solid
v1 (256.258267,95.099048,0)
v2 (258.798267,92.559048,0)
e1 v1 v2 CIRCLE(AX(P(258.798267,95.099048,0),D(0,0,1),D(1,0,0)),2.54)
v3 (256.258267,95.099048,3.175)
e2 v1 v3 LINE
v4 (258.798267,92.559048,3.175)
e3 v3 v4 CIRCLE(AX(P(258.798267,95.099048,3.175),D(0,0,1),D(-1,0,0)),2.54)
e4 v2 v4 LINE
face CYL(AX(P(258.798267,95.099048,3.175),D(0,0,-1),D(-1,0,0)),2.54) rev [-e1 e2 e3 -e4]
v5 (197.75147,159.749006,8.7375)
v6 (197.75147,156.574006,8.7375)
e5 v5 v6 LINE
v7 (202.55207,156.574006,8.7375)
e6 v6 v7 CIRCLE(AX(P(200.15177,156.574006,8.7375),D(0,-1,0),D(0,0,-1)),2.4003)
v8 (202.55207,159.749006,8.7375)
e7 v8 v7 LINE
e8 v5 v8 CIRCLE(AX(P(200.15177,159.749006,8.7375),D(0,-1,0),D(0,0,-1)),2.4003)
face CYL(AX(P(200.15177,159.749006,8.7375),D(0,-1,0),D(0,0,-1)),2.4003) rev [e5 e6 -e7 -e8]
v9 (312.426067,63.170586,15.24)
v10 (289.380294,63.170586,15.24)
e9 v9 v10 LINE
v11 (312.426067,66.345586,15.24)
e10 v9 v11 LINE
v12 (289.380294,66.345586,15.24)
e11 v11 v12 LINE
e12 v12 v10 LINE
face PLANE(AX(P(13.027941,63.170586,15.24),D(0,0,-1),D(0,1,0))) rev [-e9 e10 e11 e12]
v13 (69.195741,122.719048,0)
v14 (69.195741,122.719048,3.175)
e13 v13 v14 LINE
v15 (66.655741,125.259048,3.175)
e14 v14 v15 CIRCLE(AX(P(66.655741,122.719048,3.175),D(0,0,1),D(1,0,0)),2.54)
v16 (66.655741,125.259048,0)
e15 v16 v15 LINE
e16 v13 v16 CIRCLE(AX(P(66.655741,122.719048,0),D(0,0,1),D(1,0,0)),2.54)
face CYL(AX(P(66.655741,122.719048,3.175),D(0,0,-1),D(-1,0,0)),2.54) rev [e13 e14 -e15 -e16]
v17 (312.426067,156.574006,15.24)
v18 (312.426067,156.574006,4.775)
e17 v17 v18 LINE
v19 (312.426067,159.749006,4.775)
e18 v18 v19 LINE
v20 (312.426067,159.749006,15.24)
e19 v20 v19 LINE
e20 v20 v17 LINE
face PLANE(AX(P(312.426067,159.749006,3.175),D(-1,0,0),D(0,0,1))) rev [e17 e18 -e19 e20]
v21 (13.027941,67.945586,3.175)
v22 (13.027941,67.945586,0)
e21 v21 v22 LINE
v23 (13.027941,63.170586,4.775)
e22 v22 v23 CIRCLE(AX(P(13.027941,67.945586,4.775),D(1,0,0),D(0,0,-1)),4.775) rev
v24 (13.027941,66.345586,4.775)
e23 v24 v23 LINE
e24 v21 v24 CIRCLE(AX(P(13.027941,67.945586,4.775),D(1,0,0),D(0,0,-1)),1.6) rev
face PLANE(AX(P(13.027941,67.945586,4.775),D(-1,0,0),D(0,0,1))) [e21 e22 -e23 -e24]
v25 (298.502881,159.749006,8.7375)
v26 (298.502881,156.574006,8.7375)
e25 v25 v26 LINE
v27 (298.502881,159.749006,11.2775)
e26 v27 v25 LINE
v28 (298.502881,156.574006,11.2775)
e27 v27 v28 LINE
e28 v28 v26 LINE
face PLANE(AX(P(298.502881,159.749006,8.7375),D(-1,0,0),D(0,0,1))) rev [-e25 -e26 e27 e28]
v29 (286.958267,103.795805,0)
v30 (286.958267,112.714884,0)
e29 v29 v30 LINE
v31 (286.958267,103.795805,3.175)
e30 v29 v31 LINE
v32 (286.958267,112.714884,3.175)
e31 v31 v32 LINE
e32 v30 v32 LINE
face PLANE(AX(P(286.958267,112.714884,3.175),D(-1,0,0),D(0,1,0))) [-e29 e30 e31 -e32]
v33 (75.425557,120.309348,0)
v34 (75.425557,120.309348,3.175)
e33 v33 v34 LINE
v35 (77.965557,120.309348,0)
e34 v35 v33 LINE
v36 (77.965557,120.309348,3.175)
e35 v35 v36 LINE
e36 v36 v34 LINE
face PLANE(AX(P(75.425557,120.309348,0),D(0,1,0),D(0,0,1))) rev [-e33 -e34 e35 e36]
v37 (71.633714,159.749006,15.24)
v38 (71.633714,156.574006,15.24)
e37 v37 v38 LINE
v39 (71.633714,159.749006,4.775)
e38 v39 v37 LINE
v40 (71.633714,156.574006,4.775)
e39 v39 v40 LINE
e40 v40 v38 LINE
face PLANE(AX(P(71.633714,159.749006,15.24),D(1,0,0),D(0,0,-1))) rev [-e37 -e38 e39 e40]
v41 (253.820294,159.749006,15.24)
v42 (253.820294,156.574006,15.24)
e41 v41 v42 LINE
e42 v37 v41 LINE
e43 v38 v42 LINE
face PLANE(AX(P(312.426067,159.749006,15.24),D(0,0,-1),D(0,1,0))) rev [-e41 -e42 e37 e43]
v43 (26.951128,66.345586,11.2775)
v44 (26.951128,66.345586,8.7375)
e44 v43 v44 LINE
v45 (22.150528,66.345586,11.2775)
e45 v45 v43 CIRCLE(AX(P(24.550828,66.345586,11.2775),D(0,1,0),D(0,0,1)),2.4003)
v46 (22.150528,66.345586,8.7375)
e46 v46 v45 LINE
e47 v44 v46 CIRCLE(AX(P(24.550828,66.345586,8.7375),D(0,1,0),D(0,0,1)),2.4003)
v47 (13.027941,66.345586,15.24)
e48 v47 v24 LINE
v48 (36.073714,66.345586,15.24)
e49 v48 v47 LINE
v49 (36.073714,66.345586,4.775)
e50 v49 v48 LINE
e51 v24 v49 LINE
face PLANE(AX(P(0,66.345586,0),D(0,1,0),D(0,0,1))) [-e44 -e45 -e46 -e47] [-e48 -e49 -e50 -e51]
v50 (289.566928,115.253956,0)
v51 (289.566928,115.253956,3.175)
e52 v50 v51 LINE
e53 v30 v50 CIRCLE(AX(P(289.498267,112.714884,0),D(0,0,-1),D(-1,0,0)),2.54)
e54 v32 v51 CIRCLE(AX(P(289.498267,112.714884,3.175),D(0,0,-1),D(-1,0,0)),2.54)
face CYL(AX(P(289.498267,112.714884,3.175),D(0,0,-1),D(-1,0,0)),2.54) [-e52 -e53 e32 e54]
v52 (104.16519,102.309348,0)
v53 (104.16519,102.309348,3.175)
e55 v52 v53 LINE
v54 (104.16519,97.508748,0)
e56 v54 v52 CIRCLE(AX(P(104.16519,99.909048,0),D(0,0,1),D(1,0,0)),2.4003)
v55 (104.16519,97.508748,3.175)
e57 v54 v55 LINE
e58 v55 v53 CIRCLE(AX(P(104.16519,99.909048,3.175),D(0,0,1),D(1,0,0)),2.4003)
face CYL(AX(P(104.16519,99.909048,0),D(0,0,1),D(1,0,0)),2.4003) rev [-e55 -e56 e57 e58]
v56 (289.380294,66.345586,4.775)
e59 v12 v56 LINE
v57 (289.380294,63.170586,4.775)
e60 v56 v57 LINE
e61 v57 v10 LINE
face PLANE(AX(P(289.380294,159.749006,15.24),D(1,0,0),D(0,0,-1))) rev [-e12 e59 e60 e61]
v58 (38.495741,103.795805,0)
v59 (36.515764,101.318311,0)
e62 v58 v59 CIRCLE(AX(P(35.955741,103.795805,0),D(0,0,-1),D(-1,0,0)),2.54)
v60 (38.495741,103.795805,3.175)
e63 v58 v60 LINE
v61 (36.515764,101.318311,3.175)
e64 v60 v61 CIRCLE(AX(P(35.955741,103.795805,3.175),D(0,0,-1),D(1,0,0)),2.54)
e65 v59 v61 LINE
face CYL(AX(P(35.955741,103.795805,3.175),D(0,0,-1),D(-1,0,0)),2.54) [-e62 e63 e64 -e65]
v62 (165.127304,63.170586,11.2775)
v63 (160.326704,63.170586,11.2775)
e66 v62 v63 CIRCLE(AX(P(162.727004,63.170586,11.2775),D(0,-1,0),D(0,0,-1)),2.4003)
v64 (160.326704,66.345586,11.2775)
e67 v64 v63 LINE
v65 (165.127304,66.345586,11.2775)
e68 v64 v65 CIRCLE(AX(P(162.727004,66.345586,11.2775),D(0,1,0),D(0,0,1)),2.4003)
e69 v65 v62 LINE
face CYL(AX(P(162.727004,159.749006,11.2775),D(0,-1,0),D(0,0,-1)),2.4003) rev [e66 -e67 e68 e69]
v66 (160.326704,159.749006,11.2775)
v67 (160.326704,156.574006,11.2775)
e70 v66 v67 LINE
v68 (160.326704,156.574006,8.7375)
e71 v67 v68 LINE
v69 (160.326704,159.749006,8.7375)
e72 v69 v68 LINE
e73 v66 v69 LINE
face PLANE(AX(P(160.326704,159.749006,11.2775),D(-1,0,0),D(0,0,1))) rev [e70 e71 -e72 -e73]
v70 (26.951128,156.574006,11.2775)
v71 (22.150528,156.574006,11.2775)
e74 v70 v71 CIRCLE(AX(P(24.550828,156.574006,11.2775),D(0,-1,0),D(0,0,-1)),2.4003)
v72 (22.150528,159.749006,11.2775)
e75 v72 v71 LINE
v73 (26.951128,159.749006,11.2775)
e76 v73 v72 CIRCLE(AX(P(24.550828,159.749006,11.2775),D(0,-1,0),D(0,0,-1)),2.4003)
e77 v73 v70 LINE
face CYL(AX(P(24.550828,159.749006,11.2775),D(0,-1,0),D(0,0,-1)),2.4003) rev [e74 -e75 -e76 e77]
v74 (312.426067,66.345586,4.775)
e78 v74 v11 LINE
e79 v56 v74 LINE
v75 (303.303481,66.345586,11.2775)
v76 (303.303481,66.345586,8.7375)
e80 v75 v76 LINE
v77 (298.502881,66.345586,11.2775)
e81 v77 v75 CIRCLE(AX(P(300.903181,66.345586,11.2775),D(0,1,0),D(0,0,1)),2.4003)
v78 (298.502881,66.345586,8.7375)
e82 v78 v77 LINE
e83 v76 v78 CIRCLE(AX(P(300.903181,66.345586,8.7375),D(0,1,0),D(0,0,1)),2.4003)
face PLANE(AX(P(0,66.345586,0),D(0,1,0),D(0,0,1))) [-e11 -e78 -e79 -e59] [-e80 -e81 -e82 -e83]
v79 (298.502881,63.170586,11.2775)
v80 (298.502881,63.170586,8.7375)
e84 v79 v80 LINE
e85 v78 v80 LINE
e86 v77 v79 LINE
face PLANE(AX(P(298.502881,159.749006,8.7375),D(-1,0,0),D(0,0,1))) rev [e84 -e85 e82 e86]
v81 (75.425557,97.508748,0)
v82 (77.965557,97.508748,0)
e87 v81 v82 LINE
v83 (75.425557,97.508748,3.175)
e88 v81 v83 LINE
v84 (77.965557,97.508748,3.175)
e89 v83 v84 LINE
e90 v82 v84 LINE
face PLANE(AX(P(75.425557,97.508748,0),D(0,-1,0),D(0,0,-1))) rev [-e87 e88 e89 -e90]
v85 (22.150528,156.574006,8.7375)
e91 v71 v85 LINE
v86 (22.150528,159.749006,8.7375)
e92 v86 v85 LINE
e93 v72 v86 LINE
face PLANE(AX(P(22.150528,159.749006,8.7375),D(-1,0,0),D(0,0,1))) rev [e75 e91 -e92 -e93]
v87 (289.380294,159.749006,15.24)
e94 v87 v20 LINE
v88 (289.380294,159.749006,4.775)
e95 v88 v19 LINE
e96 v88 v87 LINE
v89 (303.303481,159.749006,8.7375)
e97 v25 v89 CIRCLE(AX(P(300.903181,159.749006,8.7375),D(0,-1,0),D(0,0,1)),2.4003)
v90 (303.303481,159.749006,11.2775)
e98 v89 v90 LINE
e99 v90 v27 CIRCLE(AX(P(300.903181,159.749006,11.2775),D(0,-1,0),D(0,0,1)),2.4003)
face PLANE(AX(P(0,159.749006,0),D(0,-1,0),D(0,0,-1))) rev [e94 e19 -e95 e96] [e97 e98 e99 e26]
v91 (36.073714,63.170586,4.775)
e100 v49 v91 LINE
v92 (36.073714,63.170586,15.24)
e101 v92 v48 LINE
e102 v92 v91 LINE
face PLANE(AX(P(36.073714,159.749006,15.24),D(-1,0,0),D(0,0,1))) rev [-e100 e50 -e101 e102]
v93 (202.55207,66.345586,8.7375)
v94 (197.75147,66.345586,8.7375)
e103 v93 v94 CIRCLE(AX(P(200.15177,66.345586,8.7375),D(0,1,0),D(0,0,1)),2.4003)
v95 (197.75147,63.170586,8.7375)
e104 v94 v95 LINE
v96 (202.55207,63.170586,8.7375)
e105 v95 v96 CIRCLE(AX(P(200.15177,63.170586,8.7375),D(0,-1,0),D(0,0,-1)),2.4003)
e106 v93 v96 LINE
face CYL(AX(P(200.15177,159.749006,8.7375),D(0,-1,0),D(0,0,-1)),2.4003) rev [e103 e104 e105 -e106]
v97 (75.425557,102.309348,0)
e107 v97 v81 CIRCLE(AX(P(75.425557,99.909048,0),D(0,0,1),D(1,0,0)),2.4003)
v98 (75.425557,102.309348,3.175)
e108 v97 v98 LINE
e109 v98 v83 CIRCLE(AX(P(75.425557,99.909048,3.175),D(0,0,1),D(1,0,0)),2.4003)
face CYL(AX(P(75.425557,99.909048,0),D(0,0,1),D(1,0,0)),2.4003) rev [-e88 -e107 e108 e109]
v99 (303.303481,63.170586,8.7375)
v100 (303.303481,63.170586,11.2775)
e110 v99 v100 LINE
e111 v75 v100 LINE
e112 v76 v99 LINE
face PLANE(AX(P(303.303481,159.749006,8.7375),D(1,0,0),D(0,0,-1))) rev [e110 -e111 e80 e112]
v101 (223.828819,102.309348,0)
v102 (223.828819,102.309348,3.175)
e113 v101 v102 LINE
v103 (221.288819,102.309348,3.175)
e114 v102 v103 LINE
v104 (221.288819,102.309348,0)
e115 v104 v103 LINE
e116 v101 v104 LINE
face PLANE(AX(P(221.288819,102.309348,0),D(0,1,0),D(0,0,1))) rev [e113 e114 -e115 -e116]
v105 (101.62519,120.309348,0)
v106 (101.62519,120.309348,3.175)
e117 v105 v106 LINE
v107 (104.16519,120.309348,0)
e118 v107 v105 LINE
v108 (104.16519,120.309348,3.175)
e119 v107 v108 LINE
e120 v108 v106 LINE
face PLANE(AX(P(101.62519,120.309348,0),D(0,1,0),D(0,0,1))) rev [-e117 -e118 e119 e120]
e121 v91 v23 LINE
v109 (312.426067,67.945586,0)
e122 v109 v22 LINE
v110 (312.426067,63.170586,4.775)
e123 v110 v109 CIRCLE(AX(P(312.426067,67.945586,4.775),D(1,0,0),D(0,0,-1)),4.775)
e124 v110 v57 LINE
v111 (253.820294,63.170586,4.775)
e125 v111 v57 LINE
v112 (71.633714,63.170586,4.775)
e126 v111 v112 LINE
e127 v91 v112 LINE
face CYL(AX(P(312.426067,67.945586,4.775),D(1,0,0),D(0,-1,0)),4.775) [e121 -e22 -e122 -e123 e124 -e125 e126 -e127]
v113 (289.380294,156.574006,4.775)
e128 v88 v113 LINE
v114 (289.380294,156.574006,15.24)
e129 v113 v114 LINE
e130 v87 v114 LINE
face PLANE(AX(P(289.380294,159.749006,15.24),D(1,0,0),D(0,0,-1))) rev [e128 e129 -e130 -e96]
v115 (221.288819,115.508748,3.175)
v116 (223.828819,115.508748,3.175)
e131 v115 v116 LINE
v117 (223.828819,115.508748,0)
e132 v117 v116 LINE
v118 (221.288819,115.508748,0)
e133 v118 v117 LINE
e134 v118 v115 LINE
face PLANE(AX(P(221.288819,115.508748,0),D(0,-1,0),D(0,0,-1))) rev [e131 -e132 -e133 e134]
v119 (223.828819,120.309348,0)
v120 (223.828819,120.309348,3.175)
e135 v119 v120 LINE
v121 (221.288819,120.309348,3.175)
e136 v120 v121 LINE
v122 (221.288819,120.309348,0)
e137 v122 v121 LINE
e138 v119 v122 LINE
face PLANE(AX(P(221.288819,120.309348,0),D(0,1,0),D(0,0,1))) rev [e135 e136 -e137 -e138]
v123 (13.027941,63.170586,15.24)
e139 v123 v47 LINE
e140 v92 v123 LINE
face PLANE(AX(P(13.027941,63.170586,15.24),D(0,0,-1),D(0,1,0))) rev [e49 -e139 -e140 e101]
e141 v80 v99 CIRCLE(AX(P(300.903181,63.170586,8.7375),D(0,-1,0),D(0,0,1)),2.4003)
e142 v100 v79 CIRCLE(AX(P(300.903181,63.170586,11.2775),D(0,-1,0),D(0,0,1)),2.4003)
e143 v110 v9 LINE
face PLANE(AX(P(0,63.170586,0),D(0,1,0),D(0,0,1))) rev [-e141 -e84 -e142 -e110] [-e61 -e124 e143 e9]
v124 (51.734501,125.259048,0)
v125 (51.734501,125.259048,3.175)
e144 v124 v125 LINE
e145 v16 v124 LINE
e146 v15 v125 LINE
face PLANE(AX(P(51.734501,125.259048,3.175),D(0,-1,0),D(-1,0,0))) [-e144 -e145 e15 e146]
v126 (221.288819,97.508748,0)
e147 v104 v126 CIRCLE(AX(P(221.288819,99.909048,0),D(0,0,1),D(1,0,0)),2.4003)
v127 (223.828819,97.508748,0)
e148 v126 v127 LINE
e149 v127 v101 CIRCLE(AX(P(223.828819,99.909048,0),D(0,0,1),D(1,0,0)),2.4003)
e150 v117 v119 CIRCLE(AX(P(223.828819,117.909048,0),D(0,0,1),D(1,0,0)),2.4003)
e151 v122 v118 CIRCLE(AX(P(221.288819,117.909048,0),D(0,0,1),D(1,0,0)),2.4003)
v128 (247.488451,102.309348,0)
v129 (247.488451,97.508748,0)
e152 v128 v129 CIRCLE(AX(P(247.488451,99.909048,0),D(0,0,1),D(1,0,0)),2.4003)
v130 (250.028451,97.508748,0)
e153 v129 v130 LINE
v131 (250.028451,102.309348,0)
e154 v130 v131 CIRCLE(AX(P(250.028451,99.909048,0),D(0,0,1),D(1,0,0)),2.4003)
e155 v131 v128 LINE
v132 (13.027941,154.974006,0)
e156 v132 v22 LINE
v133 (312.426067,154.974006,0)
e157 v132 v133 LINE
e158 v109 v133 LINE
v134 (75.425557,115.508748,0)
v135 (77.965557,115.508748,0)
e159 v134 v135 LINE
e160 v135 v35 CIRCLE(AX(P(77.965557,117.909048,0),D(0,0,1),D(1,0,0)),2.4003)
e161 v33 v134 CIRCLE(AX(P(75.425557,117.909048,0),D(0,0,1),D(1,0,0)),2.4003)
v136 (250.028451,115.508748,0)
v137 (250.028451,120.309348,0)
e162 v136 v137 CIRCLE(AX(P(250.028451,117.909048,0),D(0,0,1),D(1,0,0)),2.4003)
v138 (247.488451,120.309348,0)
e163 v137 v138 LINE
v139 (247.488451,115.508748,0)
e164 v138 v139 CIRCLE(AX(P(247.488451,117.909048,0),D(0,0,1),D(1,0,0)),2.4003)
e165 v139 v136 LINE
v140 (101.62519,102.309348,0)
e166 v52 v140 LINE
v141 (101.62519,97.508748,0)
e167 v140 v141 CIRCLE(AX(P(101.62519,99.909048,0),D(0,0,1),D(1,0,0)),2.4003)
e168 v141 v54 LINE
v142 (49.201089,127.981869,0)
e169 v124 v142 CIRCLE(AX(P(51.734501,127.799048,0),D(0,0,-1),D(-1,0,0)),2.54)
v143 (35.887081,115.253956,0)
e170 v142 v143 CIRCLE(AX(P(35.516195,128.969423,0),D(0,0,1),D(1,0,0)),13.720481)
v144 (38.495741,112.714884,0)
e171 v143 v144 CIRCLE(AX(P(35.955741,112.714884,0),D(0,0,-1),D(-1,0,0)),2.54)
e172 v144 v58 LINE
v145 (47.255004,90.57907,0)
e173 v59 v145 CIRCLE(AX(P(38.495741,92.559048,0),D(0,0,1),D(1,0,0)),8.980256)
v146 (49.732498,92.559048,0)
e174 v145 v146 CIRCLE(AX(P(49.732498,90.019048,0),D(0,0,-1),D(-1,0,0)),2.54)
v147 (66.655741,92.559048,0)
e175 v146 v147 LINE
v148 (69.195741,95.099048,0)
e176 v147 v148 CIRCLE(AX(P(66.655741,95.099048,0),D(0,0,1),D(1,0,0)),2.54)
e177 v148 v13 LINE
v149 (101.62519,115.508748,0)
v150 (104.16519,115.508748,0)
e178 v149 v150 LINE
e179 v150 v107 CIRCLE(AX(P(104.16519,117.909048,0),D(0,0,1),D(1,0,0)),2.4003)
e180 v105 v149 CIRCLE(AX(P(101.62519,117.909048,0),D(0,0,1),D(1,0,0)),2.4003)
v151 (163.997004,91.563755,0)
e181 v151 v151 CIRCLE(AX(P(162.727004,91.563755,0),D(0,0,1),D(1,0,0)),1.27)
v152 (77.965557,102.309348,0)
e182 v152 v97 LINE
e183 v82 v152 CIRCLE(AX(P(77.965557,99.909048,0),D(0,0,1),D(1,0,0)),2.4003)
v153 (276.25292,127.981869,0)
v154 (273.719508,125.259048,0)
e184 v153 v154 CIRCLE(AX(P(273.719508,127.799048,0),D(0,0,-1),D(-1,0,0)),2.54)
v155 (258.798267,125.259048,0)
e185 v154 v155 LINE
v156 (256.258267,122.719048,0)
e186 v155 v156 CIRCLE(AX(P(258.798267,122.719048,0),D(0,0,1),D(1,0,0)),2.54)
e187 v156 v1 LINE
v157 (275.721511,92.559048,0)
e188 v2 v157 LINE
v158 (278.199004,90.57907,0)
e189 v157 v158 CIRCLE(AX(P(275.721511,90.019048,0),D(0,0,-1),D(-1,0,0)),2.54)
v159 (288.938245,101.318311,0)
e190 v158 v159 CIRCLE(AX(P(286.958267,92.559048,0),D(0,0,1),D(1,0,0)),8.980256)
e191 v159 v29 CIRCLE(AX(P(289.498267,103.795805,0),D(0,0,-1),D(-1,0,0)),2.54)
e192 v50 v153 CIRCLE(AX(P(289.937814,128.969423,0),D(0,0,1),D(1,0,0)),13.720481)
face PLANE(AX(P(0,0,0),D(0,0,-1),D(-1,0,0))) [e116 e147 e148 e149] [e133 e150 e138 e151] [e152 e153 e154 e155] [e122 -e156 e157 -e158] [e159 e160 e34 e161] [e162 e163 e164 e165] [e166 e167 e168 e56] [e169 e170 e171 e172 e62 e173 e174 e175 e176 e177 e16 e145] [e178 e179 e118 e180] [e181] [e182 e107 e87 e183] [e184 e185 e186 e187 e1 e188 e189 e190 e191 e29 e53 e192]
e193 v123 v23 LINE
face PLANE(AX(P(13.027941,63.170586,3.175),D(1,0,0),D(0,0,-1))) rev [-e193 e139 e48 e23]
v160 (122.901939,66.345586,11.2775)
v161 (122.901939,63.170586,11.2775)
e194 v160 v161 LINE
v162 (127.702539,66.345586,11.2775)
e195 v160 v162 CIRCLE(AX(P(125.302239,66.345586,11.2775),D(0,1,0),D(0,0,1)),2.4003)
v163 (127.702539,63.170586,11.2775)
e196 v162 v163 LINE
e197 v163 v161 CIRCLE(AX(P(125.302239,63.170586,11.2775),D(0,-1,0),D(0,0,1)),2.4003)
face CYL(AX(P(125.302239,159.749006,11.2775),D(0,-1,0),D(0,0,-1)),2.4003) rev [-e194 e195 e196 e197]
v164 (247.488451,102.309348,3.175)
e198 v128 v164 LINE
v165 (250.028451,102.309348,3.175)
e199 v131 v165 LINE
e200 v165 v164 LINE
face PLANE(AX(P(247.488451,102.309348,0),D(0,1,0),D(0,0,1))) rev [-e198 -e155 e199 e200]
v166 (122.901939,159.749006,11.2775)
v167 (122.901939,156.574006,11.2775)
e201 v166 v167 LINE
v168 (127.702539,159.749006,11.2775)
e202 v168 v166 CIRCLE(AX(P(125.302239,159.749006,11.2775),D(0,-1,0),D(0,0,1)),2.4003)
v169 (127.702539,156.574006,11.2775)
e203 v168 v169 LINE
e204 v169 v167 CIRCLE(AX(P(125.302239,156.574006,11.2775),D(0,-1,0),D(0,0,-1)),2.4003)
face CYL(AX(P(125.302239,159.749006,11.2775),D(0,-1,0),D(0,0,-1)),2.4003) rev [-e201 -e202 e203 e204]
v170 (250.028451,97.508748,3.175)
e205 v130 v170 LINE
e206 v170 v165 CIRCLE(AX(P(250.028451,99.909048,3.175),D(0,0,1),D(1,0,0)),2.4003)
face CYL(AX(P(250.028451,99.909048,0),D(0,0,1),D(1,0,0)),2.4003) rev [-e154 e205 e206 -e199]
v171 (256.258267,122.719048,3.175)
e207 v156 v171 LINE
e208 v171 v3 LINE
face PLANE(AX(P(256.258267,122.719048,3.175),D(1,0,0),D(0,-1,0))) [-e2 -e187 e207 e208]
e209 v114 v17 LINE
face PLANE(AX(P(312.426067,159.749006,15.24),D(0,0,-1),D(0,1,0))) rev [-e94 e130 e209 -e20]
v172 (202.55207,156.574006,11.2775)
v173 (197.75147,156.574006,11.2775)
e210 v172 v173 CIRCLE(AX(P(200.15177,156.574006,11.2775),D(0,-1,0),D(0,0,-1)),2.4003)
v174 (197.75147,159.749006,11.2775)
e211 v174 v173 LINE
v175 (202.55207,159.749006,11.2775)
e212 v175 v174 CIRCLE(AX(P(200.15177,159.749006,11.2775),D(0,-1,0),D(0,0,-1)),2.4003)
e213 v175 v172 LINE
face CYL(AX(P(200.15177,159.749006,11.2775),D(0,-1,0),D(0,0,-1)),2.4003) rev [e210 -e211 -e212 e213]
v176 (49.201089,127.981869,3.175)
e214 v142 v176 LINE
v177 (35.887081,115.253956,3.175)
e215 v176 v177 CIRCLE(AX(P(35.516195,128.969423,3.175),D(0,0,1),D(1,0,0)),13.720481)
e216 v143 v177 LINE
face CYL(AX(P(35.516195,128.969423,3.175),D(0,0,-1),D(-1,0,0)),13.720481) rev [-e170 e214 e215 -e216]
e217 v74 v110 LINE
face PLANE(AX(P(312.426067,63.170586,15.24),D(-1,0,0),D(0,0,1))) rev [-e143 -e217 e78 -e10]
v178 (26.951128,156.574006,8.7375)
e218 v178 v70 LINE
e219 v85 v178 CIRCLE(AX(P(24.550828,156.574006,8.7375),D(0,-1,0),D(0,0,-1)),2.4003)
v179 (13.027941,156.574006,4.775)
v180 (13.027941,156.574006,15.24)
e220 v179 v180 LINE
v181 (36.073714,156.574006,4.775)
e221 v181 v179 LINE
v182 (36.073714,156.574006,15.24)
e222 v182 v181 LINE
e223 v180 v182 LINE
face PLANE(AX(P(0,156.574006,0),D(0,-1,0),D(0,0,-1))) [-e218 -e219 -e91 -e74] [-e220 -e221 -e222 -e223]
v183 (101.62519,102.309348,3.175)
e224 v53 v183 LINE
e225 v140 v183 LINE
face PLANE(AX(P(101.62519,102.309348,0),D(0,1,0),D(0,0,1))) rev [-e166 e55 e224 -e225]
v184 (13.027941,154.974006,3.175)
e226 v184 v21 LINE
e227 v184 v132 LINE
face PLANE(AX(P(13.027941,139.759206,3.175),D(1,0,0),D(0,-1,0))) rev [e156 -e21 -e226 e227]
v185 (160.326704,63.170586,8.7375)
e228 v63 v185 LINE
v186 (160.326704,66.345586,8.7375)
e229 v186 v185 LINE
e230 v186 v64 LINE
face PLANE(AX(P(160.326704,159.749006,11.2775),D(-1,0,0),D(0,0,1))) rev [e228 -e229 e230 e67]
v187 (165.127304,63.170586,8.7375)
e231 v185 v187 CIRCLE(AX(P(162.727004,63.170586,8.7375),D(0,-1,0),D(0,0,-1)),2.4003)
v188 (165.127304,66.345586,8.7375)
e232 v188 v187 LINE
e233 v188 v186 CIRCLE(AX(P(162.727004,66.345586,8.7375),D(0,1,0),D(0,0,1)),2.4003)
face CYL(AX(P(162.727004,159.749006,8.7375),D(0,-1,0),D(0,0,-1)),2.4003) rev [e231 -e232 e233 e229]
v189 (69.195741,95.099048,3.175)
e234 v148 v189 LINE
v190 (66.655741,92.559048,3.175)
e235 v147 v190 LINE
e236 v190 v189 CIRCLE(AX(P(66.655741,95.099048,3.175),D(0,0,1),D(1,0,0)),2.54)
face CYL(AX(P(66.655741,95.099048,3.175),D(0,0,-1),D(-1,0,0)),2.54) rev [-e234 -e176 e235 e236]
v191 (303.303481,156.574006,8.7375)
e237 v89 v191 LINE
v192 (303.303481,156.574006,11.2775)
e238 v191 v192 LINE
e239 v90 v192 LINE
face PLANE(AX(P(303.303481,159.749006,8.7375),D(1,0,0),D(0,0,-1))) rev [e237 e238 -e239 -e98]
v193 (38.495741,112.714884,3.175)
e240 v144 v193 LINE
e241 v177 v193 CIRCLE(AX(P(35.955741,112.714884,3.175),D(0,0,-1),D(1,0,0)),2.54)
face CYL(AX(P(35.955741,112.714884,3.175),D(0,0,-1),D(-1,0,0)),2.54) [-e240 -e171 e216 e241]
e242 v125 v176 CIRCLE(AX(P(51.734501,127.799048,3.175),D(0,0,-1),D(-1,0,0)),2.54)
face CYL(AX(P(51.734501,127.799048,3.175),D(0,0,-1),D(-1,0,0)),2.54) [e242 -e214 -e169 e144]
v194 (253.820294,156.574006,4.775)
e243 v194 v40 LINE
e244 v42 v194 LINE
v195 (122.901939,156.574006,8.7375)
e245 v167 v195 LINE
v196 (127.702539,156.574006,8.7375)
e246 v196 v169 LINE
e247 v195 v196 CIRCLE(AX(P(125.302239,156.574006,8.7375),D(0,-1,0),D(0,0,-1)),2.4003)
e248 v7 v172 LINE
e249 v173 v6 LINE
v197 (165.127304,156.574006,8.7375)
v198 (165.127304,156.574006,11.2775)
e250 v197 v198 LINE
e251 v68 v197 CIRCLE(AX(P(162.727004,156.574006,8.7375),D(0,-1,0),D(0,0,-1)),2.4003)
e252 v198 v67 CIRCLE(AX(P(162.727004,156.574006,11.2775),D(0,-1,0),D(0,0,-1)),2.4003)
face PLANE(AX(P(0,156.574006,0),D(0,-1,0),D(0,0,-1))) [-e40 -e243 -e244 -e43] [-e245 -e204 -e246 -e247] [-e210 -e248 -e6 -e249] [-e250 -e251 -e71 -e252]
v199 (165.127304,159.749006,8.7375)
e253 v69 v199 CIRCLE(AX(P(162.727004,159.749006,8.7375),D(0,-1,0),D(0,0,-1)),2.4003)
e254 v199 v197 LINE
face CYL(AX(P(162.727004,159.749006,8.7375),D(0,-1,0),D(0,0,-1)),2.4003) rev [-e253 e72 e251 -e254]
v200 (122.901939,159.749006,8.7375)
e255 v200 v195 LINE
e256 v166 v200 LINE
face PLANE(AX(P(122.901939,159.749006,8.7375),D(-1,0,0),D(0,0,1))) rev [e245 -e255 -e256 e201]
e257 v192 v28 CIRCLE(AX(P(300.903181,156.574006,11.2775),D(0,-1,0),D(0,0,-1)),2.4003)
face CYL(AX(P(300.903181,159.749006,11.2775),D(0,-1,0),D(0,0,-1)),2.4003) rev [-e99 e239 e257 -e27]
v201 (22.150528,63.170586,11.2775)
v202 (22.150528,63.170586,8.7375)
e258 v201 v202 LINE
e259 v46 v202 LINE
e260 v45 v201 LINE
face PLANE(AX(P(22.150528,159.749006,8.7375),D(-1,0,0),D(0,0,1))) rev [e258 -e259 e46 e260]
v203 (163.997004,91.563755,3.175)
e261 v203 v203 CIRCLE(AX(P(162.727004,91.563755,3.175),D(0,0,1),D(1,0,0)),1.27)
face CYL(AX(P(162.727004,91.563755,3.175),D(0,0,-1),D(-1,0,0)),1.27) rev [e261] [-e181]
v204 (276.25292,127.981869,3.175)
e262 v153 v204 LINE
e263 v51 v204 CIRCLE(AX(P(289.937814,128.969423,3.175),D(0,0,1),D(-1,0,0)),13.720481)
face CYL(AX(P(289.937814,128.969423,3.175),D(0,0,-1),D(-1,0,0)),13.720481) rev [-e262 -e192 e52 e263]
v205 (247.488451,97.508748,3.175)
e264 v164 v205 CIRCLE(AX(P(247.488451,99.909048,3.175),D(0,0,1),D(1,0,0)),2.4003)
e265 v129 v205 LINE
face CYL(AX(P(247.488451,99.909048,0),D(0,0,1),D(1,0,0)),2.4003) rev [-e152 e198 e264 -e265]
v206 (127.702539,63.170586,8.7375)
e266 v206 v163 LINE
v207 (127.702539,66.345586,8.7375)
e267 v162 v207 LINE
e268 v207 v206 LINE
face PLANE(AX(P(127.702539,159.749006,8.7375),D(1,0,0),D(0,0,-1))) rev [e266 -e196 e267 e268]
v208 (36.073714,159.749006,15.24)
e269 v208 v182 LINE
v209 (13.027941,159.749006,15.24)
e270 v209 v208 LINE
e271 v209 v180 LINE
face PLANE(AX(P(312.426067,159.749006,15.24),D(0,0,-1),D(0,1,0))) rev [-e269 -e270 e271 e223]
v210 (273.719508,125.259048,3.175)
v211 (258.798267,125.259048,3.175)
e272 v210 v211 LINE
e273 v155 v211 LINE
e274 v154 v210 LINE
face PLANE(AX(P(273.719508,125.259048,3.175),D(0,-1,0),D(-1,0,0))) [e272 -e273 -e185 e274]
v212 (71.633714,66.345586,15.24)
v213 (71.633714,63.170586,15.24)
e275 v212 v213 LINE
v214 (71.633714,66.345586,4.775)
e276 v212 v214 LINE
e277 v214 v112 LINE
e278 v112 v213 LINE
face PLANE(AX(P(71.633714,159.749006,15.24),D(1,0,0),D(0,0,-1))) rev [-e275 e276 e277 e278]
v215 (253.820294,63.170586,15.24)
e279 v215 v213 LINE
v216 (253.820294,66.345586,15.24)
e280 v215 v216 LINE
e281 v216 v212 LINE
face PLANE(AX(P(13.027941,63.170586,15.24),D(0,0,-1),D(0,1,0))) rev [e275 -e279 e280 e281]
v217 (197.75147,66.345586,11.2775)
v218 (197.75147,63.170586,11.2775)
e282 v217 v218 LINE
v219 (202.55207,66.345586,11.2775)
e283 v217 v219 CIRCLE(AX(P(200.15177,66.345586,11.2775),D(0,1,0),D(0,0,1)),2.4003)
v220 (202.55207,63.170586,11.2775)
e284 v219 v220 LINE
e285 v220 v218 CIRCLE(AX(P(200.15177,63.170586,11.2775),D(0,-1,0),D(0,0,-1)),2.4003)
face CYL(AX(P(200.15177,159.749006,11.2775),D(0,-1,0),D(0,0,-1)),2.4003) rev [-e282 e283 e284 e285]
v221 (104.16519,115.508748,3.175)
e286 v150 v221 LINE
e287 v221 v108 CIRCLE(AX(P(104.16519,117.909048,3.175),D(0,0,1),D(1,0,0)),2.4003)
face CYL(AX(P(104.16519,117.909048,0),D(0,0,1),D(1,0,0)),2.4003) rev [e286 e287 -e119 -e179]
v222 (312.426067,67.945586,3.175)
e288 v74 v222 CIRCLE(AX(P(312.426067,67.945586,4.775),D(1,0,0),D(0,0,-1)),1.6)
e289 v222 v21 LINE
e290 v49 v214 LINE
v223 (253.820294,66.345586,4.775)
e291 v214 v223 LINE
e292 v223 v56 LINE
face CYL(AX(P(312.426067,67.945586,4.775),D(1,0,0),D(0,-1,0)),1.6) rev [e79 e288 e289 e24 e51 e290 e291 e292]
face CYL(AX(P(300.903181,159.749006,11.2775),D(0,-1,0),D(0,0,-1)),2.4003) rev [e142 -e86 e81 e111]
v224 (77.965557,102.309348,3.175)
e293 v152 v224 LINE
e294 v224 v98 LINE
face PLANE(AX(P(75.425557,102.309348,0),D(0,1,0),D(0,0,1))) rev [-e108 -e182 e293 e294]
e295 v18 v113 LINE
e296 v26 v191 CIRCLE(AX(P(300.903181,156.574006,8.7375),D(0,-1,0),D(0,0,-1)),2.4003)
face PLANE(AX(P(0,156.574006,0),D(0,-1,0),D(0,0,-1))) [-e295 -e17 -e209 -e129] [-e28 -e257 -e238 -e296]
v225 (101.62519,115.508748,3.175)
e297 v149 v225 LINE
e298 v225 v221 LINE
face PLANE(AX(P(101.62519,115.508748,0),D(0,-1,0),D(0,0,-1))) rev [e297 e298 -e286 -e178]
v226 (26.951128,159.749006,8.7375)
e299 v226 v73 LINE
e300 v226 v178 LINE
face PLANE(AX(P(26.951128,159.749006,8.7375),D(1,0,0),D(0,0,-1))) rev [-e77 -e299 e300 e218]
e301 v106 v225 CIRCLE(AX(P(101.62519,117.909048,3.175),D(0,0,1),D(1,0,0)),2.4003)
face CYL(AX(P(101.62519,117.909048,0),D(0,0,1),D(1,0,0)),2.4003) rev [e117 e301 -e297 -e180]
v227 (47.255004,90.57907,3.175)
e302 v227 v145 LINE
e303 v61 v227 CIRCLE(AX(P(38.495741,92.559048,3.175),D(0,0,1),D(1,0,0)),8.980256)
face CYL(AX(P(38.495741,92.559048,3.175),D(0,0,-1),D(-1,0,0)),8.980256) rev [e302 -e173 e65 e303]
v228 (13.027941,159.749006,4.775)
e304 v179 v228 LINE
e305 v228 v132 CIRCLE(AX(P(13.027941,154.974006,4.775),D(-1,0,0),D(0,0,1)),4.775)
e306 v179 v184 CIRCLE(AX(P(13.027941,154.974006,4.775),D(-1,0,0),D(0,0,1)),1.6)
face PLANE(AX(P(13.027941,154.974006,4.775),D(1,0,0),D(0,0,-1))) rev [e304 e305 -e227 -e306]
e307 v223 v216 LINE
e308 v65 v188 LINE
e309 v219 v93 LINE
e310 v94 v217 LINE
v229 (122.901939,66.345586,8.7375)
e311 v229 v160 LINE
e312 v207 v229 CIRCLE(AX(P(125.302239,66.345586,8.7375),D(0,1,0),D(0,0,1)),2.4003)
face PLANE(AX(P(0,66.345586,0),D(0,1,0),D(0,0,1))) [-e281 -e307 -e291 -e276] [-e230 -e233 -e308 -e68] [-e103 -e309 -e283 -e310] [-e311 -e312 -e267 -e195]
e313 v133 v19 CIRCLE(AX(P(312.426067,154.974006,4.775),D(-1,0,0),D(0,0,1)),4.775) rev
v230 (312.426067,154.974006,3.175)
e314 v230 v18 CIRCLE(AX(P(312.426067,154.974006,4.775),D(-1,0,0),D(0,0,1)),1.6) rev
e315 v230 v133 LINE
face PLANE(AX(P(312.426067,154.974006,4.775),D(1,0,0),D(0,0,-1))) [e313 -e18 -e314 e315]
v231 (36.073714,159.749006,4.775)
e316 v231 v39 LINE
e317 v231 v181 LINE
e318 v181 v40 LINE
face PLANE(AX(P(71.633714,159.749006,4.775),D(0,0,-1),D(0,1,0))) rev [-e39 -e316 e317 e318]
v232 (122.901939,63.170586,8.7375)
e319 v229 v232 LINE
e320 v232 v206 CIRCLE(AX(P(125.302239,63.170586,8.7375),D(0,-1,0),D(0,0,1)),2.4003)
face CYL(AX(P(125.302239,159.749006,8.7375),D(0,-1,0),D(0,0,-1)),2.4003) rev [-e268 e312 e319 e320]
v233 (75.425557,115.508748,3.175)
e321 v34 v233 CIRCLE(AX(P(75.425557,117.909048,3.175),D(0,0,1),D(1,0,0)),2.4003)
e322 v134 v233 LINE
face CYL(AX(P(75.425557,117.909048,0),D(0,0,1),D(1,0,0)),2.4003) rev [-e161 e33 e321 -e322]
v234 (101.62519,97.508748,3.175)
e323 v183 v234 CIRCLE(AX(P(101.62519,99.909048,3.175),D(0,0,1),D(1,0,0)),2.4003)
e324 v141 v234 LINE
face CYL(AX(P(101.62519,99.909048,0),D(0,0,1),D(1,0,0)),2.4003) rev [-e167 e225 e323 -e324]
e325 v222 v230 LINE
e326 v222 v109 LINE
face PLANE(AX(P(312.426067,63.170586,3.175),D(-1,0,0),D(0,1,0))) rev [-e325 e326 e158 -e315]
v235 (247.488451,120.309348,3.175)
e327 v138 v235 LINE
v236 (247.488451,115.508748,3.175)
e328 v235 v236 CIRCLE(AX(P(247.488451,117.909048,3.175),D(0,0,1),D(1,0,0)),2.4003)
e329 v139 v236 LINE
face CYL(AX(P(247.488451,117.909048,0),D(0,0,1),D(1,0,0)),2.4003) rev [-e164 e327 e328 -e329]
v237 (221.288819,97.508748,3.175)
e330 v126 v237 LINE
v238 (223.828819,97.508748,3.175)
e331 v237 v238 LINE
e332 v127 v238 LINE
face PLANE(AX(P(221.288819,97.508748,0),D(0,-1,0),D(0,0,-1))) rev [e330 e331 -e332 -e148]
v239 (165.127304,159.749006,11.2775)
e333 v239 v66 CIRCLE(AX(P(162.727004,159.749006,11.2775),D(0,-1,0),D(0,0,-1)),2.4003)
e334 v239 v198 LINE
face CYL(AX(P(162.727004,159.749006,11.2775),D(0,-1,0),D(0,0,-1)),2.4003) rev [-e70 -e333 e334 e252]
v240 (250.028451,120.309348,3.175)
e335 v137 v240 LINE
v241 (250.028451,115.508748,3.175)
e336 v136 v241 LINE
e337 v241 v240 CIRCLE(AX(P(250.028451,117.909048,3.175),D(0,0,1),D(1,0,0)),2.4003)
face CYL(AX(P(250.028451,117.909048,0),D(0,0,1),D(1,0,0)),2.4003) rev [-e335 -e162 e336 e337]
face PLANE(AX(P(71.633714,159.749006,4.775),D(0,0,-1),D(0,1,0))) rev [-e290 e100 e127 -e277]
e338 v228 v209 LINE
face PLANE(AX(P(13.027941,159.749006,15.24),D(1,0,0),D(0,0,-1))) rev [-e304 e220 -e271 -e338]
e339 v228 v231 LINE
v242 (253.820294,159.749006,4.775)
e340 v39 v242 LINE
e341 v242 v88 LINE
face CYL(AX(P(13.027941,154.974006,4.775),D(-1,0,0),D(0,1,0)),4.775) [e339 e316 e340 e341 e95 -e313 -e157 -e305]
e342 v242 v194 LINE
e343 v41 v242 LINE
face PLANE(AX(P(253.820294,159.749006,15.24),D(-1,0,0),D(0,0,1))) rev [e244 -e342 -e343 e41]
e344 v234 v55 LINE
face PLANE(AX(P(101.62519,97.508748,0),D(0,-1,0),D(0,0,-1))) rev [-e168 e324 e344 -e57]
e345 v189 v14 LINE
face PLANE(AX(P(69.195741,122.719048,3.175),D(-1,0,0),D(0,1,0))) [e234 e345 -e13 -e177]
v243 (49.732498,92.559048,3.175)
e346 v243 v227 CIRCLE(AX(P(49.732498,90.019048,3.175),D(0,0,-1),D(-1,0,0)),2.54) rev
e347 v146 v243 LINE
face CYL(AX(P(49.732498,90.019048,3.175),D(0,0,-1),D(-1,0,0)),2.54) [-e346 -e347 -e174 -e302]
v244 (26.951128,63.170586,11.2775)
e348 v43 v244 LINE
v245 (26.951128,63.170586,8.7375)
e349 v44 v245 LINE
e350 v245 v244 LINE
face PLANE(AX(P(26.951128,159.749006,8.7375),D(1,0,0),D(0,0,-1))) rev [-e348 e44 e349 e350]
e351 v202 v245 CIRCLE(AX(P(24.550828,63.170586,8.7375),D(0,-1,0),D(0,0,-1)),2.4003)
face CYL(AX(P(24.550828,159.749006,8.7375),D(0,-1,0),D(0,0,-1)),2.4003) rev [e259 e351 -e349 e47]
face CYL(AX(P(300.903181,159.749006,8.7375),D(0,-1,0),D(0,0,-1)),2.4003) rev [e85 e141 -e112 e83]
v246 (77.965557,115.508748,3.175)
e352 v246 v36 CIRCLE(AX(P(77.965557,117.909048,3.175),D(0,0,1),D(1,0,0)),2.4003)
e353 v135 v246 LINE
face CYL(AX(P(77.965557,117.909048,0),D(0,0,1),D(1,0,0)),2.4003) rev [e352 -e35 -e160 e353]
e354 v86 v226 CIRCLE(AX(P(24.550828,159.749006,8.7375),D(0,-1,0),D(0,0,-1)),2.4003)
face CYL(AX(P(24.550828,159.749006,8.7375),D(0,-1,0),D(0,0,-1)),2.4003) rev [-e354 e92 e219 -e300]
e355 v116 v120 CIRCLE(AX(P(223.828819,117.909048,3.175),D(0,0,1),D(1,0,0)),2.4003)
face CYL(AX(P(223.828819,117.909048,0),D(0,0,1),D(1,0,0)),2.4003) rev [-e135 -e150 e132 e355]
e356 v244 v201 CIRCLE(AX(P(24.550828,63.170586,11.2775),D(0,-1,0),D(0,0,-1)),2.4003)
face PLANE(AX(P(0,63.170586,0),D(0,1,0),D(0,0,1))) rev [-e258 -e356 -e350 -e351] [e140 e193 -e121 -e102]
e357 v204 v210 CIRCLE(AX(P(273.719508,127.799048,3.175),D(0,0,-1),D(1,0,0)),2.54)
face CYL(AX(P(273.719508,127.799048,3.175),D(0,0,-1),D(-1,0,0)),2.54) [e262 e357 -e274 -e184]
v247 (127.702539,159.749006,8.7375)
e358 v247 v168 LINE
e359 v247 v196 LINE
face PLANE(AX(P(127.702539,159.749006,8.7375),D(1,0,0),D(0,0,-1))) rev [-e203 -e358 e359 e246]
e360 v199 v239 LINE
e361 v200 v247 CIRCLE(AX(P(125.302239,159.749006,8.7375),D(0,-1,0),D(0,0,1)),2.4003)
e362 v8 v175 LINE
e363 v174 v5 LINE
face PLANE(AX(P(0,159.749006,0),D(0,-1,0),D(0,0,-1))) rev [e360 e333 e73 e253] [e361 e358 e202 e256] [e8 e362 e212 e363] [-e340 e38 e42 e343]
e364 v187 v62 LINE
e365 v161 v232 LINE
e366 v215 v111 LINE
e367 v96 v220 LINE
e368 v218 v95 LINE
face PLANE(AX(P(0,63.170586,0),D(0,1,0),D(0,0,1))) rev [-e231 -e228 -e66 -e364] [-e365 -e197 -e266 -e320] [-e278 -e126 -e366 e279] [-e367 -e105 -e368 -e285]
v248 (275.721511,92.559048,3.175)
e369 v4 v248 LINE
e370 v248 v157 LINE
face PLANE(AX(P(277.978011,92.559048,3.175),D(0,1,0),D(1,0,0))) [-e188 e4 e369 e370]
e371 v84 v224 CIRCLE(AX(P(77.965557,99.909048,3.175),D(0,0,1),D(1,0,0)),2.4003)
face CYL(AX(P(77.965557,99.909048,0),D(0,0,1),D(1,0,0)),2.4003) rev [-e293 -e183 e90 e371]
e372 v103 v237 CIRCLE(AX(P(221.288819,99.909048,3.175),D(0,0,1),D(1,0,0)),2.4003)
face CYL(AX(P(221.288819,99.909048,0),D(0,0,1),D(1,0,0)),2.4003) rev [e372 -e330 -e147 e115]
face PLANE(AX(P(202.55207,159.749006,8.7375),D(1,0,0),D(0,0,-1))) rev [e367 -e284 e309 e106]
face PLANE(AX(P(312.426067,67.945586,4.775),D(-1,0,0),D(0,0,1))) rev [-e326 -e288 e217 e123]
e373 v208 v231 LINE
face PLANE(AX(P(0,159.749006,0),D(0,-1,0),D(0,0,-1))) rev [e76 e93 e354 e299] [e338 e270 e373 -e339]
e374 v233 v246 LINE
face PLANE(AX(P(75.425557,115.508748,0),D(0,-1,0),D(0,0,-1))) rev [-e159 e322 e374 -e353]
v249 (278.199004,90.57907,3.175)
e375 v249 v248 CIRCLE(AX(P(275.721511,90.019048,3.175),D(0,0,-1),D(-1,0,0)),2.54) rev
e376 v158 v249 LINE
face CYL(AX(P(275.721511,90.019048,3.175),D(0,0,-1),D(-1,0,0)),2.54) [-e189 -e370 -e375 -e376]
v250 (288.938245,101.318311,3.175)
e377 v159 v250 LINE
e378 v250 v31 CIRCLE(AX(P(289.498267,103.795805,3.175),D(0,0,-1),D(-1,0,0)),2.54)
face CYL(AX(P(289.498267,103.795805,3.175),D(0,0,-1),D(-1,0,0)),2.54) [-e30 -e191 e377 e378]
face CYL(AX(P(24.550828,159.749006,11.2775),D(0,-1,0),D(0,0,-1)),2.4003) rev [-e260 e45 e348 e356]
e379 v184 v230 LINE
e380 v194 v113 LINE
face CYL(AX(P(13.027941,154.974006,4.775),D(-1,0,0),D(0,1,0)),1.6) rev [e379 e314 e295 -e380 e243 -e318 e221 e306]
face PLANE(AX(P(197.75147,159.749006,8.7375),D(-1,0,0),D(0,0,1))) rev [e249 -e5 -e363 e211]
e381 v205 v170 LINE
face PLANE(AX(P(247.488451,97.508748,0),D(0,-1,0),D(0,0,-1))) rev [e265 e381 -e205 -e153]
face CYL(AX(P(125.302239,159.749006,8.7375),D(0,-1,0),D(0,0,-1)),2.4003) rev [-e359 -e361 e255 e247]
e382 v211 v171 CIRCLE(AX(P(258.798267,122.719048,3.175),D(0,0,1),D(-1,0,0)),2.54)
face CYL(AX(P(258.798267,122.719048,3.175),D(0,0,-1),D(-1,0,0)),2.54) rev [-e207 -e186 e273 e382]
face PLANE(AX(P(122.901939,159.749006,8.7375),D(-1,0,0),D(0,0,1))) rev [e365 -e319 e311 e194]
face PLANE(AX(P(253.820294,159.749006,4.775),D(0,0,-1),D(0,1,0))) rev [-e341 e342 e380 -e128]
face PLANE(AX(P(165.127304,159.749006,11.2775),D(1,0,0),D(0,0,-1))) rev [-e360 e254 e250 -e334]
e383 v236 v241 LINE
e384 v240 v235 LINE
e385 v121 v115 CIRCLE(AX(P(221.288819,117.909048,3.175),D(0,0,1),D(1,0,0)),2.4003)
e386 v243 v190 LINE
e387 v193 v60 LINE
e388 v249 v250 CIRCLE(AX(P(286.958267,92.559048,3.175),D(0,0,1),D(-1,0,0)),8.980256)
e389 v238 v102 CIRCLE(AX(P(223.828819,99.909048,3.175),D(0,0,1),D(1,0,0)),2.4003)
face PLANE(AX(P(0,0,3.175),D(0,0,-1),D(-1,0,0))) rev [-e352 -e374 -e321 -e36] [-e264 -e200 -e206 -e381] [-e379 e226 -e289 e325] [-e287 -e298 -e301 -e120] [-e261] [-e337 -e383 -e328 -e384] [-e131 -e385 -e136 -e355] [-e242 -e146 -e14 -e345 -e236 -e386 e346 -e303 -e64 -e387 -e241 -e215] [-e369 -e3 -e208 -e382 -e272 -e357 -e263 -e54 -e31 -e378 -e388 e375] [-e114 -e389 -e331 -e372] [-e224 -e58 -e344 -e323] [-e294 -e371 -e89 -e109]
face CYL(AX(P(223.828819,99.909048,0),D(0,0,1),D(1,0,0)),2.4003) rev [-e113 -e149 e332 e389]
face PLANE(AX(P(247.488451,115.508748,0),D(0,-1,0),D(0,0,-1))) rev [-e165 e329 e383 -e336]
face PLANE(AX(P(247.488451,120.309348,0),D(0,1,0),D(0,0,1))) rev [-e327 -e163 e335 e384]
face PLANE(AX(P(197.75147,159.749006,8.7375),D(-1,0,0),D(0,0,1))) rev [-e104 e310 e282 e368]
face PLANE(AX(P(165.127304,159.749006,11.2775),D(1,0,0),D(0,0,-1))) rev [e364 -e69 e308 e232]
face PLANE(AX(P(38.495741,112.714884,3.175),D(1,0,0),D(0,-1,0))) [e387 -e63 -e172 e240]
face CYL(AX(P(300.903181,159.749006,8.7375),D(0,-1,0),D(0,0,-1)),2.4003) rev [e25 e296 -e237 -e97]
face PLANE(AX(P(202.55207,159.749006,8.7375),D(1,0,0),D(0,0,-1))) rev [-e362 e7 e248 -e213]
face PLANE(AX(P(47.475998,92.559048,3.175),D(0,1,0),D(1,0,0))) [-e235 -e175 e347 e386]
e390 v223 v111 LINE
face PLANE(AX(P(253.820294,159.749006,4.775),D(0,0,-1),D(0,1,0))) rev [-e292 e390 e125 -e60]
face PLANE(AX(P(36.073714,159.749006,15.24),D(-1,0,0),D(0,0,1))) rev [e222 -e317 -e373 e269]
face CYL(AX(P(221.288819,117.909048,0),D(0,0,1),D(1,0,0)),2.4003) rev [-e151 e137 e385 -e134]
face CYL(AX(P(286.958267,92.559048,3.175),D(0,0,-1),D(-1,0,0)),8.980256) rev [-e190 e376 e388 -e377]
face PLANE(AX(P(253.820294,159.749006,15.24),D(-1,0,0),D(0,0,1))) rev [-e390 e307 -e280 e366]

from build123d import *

# Parameters (mm, degrees)
SKETCH1_R                      = 1.27
BOSS_EXTRUDE1_DEPTH            = 3.175
EDGE_FLANGE1_STRIP_W           = 15.900000204
EDGE_FLANGE1_STRIP_H           = 3.175
EDGE_FLANGE1_STRIP_CUT_DEPTH   = 299.398126018
EDGE_FLANGE1_STRIP_2_W         = 15.900000204
EDGE_FLANGE1_STRIP_2_H         = 3.175
EDGE_FLANGE1_STRIP_CUT_2_DEPTH = 299.398126018
EDGE_FLANGE1_DEPTH             = 299.398126018
EDGE_FLANGE1_BEND_DEPTH        = 299.398126018
CUT_EXTRUDE1_DEPTH             = 352.105905289
FILLET1_R                      = 2.54
CUT_EXTRUDE2_DEPTH             = 328.367830479
SKETCH24_W                     = 35.56
SKETCH24_H                     = 10.464999898
CUT_EXTRUDE3_DEPTH             = 328.367830479
CUT_EXTRUDE4_DEPTH             = 328.367830479


# Sheet-metal steps are written as plain solids
with BuildPart() as part:
    # Sketch1 → Boss-Extrude1 (new body)
    with BuildSketch(Plane.XY):
        Polygon((13.027941433, 139.759205886), (13.027941433, 83.160385886), (13.027941433, 63.170585886), (312.426067451, 63.170585886), (312.426067451, 83.160385886), (312.426067451, 139.759205886), (312.426067451, 159.749005886), (13.027941433, 159.749005886), align=None)
        with Locations((76.695557497, 117.909047818)):
            Circle(SKETCH1_R, mode=Mode.SUBTRACT)
        with Locations((102.895189625, 117.909047818)):
            Circle(SKETCH1_R, mode=Mode.SUBTRACT)
        with Locations((76.695557497, 99.909047818)):
            Circle(SKETCH1_R, mode=Mode.SUBTRACT)
        with Locations((102.895189625, 99.909047818)):
            Circle(SKETCH1_R, mode=Mode.SUBTRACT)
        with Locations((162.727004442, 91.563754554)):
            Circle(SKETCH1_R, mode=Mode.SUBTRACT)
        with Locations((222.558819258, 117.909047818)):
            Circle(SKETCH1_R, mode=Mode.SUBTRACT)
        with Locations((222.558819258, 99.909047818)):
            Circle(SKETCH1_R, mode=Mode.SUBTRACT)
        with Locations((248.758451386, 117.909047818)):
            Circle(SKETCH1_R, mode=Mode.SUBTRACT)
        with Locations((248.758451386, 99.909047818)):
            Circle(SKETCH1_R, mode=Mode.SUBTRACT)
        with BuildLine():
            Line((38.495741433, 112.714884205), (38.495741433, 103.795804516))
            ThreePointArc((38.495741433, 103.795804516), (37.939936051, 102.2100644), (36.515763704, 101.318310812))
            ThreePointArc((36.515763704, 101.318310812), (32.889303487, 85.543860468), (47.475997554, 92.559047818))
            Line((47.475997554, 92.559047818), (66.655741433, 92.559047818))
            ThreePointArc((66.655741433, 92.559047818), (68.451792657, 93.302996594), (69.195741433, 95.099047818))
            Line((69.195741433, 95.099047818), (69.195741433, 122.719047818))
            ThreePointArc((69.195741433, 122.719047818), (68.451792657, 124.515099042), (66.655741433, 125.259047818))
            Line((66.655741433, 125.259047818), (51.734500869, 125.259047818))
            ThreePointArc((51.734500869, 125.259047818), (49.874935778, 126.06884041), (49.201088825, 127.981868547))
            ThreePointArc((49.201088825, 127.981868547), (26.035098733, 138.887104645), (35.887081184, 115.253956037))
            ThreePointArc((35.887081184, 115.253956037), (37.727351289, 114.535048625), (38.495741433, 112.714884205))
        make_face(mode=Mode.SUBTRACT)
        with BuildLine():
            Line((286.958267451, 112.714884205), (286.958267451, 103.795804516))
            ThreePointArc((286.958267451, 103.795804516), (287.514072832, 102.2100644), (288.938245179, 101.318310812))
            ThreePointArc((288.938245179, 101.318310812), (292.564705397, 85.543860468), (277.97801133, 92.559047818))
            Line((277.97801133, 92.559047818), (258.798267451, 92.559047818))
            ThreePointArc((258.798267451, 92.559047818), (257.002216226, 93.302996594), (256.258267451, 95.099047818))
            Line((256.258267451, 95.099047818), (256.258267451, 122.719047818))
            ThreePointArc((256.258267451, 122.719047818), (257.002216226, 124.515099042), (258.798267451, 125.259047818))
            Line((258.798267451, 125.259047818), (273.719508015, 125.259047818))
            ThreePointArc((273.719508015, 125.259047818), (275.579073105, 126.06884041), (276.252920058, 127.981868547))
            ThreePointArc((276.252920058, 127.981868547), (299.418910151, 138.887104645), (289.5669277, 115.253956037))
            ThreePointArc((289.5669277, 115.253956037), (287.726657594, 114.535048625), (286.958267451, 112.714884205))
        make_face(mode=Mode.SUBTRACT)
    extrude(amount=BOSS_EXTRUDE1_DEPTH)

    # Edge-Flange1 strip (across the edge) → Edge-Flange1 strip cut (cut)
    with BuildSketch(Plane(origin=(312.426067451, 159.749005886, 3.175), x_dir=(0, -1, 0), z_dir=(-1, 0, 0))):
        with Locations((-3.175, -1.5875)):
            Rectangle(EDGE_FLANGE1_STRIP_W, EDGE_FLANGE1_STRIP_H)
    extrude(amount=EDGE_FLANGE1_STRIP_CUT_DEPTH, mode=Mode.SUBTRACT)

    # Edge-Flange1 strip 2 (across the edge) → Edge-Flange1 strip cut 2 (cut)
    with BuildSketch(Plane(origin=(13.027941433, 63.170585886, 3.175), x_dir=(0, 1, 0), z_dir=(1, 0, 0))):
        with Locations((-3.175, -1.5875)):
            Rectangle(EDGE_FLANGE1_STRIP_2_W, EDGE_FLANGE1_STRIP_2_H)
    extrude(amount=EDGE_FLANGE1_STRIP_CUT_2_DEPTH, mode=Mode.SUBTRACT)

    # Edge-Flange1 section (across the edge) → Edge-Flange1 (add)
    with BuildSketch(Plane(origin=(312.426067451, 159.749005886, 3.175), x_dir=(0, -1, 0), z_dir=(-1, 0, 0))):
        with BuildLine():
            Line((0, 1.600000102), (0, 12.065))
            Line((0, 12.065), (3.175, 12.065))
            Line((3.175, 12.065), (3.175, 1.600000102))
            ThreePointArc((3.175, 1.600000102), (3.64362918, 0.46862918), (4.775000102, 0))
            Line((4.775000102, 0), (4.775000102, -3.175))
            ThreePointArc((4.775000102, -3.175), (1.39856515, -1.77643485), (0, 1.600000102))
        make_face()
    extrude(amount=EDGE_FLANGE1_DEPTH)

    # Edge-Flange1 section 2 (across the edge) → Edge-Flange1 bend (add)
    with BuildSketch(Plane(origin=(13.027941433, 63.170585886, 3.175), x_dir=(0, 1, 0), z_dir=(1, 0, 0))):
        with BuildLine():
            Line((0, 1.600000102), (0, 12.065))
            Line((0, 12.065), (3.175, 12.065))
            Line((3.175, 12.065), (3.175, 1.600000102))
            ThreePointArc((3.175, 1.600000102), (3.64362918, 0.46862918), (4.775000102, 0))
            Line((4.775000102, 0), (4.775000102, -3.175))
            ThreePointArc((4.775000102, -3.175), (1.39856515, -1.77643485), (0, 1.600000102))
        make_face()
    extrude(amount=EDGE_FLANGE1_BEND_DEPTH)

    # Sketch18 → Cut-Extrude1 (cut, through all)
    with BuildSketch(Plane.XY.offset(3.175)):
        with BuildLine():
            Line((75.425557497, 120.309347818), (77.965557497, 120.309347818))
            ThreePointArc((77.965557497, 120.309347818), (80.365857497, 117.909047818), (77.965557497, 115.508747818))
            Line((77.965557497, 115.508747818), (75.425557497, 115.508747818))
            ThreePointArc((75.425557497, 115.508747818), (73.025257497, 117.909047818), (75.425557497, 120.309347818))
        make_face()
        with BuildLine():
            Line((101.625189625, 120.309347818), (104.165189625, 120.309347818))
            ThreePointArc((104.165189625, 120.309347818), (106.565489625, 117.909047818), (104.165189625, 115.508747818))
            Line((104.165189625, 115.508747818), (101.625189625, 115.508747818))
            ThreePointArc((101.625189625, 115.508747818), (99.224889625, 117.909047818), (101.625189625, 120.309347818))
        make_face()
        with BuildLine():
            Line((75.425557497, 102.309347818), (77.965557497, 102.309347818))
            ThreePointArc((77.965557497, 102.309347818), (80.365857497, 99.909047818), (77.965557497, 97.508747818))
            Line((77.965557497, 97.508747818), (75.425557497, 97.508747818))
            ThreePointArc((75.425557497, 97.508747818), (73.025257497, 99.909047818), (75.425557497, 102.309347818))
        make_face()
        with BuildLine():
            Line((101.625189625, 102.309347818), (104.165189625, 102.309347818))
            ThreePointArc((104.165189625, 102.309347818), (106.565489625, 99.909047818), (104.165189625, 97.508747818))
            Line((104.165189625, 97.508747818), (101.625189625, 97.508747818))
            ThreePointArc((101.625189625, 97.508747818), (99.224889625, 99.909047818), (101.625189625, 102.309347818))
        make_face()
        with BuildLine():
            Line((221.288819258, 102.309347818), (223.828819258, 102.309347818))
            ThreePointArc((223.828819258, 102.309347818), (226.229119258, 99.909047818), (223.828819258, 97.508747818))
            Line((223.828819258, 97.508747818), (221.288819258, 97.508747818))
            ThreePointArc((221.288819258, 97.508747818), (218.888519258, 99.909047818), (221.288819258, 102.309347818))
        make_face()
        with BuildLine():
            Line((221.288819258, 120.309347818), (223.828819258, 120.309347818))
            ThreePointArc((223.828819258, 120.309347818), (226.229119258, 117.909047818), (223.828819258, 115.508747818))
            Line((223.828819258, 115.508747818), (221.288819258, 115.508747818))
            ThreePointArc((221.288819258, 115.508747818), (218.888519258, 117.909047818), (221.288819258, 120.309347818))
        make_face()
        with BuildLine():
            Line((247.488451386, 120.309347818), (250.028451386, 120.309347818))
            ThreePointArc((250.028451386, 120.309347818), (252.428751386, 117.909047818), (250.028451386, 115.508747818))
            Line((250.028451386, 115.508747818), (247.488451386, 115.508747818))
            ThreePointArc((247.488451386, 115.508747818), (245.088151386, 117.909047818), (247.488451386, 120.309347818))
        make_face()
        with BuildLine():
            Line((247.488451386, 102.309347818), (250.028451386, 102.309347818))
            ThreePointArc((250.028451386, 102.309347818), (252.428751386, 99.909047818), (250.028451386, 97.508747818))
            Line((250.028451386, 97.508747818), (247.488451386, 97.508747818))
            ThreePointArc((247.488451386, 97.508747818), (245.088151386, 99.909047818), (247.488451386, 102.309347818))
        make_face()
    extrude(amount=-CUT_EXTRUDE1_DEPTH, mode=Mode.SUBTRACT)

    # Fillet1
    fillet1_edges = [part.edges().sort_by_distance(p)[0] for p in [
        (47.475997554, 92.559047818, 1.5875),
        (277.97801133, 92.559047818, 1.5875),
    ]]
    fillet(fillet1_edges, radius=FILLET1_R)

    # Sketch19 → Cut-Extrude2 (cut, through all)
    with BuildSketch(Plane.XZ.offset(-63.170585886)):
        with BuildLine():
            Line((48.052407185, 8.737500051), (48.052407185, 11.277500051))
            ThreePointArc((48.052407185, 11.277500051), (50.452707185, 13.677800051), (52.853007185, 11.277500051))
            Line((52.853007185, 11.277500051), (52.853007185, 8.737500051))
            ThreePointArc((52.853007185, 8.737500051), (50.452707185, 6.337200051), (48.052407185, 8.737500051))
        make_face()
        with BuildLine():
            Line((127.702538689, 8.737500051), (127.702538689, 11.277500051))
            ThreePointArc((127.702538689, 11.277500051), (125.302238689, 13.677800051), (122.901938689, 11.277500051))
            Line((122.901938689, 11.277500051), (122.901938689, 8.737500051))
            ThreePointArc((122.901938689, 8.737500051), (125.302238689, 6.337200051), (127.702538689, 8.737500051))
        make_face()
        with BuildLine():
            Line((197.751470194, 8.737500051), (197.751470194, 11.277500051))
            ThreePointArc((197.751470194, 11.277500051), (200.151770194, 13.677800051), (202.552070194, 11.277500051))
            Line((202.552070194, 11.277500051), (202.552070194, 8.737500051))
            ThreePointArc((202.552070194, 8.737500051), (200.151770194, 6.337200051), (197.751470194, 8.737500051))
        make_face()
        with BuildLine():
            Line((277.401601698, 8.737500051), (277.401601698, 11.277500051))
            ThreePointArc((277.401601698, 11.277500051), (275.001301698, 13.677800051), (272.601001698, 11.277500051))
            Line((272.601001698, 11.277500051), (272.601001698, 8.737500051))
            ThreePointArc((272.601001698, 8.737500051), (275.001301698, 6.337200051), (277.401601698, 8.737500051))
        make_face()
        with BuildLine():
            Line((165.127304442, 11.277500051), (165.127304442, 8.737500051))
            ThreePointArc((165.127304442, 8.737500051), (162.727004442, 6.337200051), (160.326704442, 8.737500051))
            Line((160.326704442, 8.737500051), (160.326704442, 11.277500051))
            ThreePointArc((160.326704442, 11.277500051), (162.727004442, 13.677800051), (165.127304442, 11.277500051))
        make_face()
    extrude(amount=-CUT_EXTRUDE2_DEPTH, mode=Mode.SUBTRACT)

    # Sketch24 → Cut-Extrude3 (cut, through all)
    with BuildSketch(Plane.XZ.offset(-63.170585886)):
        with Locations((53.853714442, 10.007500051)):
            Rectangle(SKETCH24_W, SKETCH24_H)
        with Locations((271.600294442, 10.007500051)):
            Rectangle(SKETCH24_W, SKETCH24_H)
    extrude(amount=-CUT_EXTRUDE3_DEPTH, mode=Mode.SUBTRACT)

    # Sketch25 → Cut-Extrude4 (cut, through all)
    with BuildSketch(Plane.XZ.offset(-63.170585886)):
        with BuildLine():
            Line((22.150527937, 8.737500051), (22.150527937, 11.277500051))
            ThreePointArc((22.150527937, 11.277500051), (24.550827937, 13.677800051), (26.951127937, 11.277500051))
            Line((26.951127937, 11.277500051), (26.951127937, 8.737500051))
            ThreePointArc((26.951127937, 8.737500051), (24.550827937, 6.337200051), (22.150527937, 8.737500051))
        make_face()
        with BuildLine():
            Line((303.303480946, 8.737500051), (303.303480946, 11.277500051))
            ThreePointArc((303.303480946, 11.277500051), (300.903180946, 13.677800051), (298.502880946, 11.277500051))
            Line((298.502880946, 11.277500051), (298.502880946, 8.737500051))
            ThreePointArc((298.502880946, 8.737500051), (300.903180946, 6.337200051), (303.303480946, 8.737500051))
        make_face()
    extrude(amount=-CUT_EXTRUDE4_DEPTH, mode=Mode.SUBTRACT)


solid = part.part
